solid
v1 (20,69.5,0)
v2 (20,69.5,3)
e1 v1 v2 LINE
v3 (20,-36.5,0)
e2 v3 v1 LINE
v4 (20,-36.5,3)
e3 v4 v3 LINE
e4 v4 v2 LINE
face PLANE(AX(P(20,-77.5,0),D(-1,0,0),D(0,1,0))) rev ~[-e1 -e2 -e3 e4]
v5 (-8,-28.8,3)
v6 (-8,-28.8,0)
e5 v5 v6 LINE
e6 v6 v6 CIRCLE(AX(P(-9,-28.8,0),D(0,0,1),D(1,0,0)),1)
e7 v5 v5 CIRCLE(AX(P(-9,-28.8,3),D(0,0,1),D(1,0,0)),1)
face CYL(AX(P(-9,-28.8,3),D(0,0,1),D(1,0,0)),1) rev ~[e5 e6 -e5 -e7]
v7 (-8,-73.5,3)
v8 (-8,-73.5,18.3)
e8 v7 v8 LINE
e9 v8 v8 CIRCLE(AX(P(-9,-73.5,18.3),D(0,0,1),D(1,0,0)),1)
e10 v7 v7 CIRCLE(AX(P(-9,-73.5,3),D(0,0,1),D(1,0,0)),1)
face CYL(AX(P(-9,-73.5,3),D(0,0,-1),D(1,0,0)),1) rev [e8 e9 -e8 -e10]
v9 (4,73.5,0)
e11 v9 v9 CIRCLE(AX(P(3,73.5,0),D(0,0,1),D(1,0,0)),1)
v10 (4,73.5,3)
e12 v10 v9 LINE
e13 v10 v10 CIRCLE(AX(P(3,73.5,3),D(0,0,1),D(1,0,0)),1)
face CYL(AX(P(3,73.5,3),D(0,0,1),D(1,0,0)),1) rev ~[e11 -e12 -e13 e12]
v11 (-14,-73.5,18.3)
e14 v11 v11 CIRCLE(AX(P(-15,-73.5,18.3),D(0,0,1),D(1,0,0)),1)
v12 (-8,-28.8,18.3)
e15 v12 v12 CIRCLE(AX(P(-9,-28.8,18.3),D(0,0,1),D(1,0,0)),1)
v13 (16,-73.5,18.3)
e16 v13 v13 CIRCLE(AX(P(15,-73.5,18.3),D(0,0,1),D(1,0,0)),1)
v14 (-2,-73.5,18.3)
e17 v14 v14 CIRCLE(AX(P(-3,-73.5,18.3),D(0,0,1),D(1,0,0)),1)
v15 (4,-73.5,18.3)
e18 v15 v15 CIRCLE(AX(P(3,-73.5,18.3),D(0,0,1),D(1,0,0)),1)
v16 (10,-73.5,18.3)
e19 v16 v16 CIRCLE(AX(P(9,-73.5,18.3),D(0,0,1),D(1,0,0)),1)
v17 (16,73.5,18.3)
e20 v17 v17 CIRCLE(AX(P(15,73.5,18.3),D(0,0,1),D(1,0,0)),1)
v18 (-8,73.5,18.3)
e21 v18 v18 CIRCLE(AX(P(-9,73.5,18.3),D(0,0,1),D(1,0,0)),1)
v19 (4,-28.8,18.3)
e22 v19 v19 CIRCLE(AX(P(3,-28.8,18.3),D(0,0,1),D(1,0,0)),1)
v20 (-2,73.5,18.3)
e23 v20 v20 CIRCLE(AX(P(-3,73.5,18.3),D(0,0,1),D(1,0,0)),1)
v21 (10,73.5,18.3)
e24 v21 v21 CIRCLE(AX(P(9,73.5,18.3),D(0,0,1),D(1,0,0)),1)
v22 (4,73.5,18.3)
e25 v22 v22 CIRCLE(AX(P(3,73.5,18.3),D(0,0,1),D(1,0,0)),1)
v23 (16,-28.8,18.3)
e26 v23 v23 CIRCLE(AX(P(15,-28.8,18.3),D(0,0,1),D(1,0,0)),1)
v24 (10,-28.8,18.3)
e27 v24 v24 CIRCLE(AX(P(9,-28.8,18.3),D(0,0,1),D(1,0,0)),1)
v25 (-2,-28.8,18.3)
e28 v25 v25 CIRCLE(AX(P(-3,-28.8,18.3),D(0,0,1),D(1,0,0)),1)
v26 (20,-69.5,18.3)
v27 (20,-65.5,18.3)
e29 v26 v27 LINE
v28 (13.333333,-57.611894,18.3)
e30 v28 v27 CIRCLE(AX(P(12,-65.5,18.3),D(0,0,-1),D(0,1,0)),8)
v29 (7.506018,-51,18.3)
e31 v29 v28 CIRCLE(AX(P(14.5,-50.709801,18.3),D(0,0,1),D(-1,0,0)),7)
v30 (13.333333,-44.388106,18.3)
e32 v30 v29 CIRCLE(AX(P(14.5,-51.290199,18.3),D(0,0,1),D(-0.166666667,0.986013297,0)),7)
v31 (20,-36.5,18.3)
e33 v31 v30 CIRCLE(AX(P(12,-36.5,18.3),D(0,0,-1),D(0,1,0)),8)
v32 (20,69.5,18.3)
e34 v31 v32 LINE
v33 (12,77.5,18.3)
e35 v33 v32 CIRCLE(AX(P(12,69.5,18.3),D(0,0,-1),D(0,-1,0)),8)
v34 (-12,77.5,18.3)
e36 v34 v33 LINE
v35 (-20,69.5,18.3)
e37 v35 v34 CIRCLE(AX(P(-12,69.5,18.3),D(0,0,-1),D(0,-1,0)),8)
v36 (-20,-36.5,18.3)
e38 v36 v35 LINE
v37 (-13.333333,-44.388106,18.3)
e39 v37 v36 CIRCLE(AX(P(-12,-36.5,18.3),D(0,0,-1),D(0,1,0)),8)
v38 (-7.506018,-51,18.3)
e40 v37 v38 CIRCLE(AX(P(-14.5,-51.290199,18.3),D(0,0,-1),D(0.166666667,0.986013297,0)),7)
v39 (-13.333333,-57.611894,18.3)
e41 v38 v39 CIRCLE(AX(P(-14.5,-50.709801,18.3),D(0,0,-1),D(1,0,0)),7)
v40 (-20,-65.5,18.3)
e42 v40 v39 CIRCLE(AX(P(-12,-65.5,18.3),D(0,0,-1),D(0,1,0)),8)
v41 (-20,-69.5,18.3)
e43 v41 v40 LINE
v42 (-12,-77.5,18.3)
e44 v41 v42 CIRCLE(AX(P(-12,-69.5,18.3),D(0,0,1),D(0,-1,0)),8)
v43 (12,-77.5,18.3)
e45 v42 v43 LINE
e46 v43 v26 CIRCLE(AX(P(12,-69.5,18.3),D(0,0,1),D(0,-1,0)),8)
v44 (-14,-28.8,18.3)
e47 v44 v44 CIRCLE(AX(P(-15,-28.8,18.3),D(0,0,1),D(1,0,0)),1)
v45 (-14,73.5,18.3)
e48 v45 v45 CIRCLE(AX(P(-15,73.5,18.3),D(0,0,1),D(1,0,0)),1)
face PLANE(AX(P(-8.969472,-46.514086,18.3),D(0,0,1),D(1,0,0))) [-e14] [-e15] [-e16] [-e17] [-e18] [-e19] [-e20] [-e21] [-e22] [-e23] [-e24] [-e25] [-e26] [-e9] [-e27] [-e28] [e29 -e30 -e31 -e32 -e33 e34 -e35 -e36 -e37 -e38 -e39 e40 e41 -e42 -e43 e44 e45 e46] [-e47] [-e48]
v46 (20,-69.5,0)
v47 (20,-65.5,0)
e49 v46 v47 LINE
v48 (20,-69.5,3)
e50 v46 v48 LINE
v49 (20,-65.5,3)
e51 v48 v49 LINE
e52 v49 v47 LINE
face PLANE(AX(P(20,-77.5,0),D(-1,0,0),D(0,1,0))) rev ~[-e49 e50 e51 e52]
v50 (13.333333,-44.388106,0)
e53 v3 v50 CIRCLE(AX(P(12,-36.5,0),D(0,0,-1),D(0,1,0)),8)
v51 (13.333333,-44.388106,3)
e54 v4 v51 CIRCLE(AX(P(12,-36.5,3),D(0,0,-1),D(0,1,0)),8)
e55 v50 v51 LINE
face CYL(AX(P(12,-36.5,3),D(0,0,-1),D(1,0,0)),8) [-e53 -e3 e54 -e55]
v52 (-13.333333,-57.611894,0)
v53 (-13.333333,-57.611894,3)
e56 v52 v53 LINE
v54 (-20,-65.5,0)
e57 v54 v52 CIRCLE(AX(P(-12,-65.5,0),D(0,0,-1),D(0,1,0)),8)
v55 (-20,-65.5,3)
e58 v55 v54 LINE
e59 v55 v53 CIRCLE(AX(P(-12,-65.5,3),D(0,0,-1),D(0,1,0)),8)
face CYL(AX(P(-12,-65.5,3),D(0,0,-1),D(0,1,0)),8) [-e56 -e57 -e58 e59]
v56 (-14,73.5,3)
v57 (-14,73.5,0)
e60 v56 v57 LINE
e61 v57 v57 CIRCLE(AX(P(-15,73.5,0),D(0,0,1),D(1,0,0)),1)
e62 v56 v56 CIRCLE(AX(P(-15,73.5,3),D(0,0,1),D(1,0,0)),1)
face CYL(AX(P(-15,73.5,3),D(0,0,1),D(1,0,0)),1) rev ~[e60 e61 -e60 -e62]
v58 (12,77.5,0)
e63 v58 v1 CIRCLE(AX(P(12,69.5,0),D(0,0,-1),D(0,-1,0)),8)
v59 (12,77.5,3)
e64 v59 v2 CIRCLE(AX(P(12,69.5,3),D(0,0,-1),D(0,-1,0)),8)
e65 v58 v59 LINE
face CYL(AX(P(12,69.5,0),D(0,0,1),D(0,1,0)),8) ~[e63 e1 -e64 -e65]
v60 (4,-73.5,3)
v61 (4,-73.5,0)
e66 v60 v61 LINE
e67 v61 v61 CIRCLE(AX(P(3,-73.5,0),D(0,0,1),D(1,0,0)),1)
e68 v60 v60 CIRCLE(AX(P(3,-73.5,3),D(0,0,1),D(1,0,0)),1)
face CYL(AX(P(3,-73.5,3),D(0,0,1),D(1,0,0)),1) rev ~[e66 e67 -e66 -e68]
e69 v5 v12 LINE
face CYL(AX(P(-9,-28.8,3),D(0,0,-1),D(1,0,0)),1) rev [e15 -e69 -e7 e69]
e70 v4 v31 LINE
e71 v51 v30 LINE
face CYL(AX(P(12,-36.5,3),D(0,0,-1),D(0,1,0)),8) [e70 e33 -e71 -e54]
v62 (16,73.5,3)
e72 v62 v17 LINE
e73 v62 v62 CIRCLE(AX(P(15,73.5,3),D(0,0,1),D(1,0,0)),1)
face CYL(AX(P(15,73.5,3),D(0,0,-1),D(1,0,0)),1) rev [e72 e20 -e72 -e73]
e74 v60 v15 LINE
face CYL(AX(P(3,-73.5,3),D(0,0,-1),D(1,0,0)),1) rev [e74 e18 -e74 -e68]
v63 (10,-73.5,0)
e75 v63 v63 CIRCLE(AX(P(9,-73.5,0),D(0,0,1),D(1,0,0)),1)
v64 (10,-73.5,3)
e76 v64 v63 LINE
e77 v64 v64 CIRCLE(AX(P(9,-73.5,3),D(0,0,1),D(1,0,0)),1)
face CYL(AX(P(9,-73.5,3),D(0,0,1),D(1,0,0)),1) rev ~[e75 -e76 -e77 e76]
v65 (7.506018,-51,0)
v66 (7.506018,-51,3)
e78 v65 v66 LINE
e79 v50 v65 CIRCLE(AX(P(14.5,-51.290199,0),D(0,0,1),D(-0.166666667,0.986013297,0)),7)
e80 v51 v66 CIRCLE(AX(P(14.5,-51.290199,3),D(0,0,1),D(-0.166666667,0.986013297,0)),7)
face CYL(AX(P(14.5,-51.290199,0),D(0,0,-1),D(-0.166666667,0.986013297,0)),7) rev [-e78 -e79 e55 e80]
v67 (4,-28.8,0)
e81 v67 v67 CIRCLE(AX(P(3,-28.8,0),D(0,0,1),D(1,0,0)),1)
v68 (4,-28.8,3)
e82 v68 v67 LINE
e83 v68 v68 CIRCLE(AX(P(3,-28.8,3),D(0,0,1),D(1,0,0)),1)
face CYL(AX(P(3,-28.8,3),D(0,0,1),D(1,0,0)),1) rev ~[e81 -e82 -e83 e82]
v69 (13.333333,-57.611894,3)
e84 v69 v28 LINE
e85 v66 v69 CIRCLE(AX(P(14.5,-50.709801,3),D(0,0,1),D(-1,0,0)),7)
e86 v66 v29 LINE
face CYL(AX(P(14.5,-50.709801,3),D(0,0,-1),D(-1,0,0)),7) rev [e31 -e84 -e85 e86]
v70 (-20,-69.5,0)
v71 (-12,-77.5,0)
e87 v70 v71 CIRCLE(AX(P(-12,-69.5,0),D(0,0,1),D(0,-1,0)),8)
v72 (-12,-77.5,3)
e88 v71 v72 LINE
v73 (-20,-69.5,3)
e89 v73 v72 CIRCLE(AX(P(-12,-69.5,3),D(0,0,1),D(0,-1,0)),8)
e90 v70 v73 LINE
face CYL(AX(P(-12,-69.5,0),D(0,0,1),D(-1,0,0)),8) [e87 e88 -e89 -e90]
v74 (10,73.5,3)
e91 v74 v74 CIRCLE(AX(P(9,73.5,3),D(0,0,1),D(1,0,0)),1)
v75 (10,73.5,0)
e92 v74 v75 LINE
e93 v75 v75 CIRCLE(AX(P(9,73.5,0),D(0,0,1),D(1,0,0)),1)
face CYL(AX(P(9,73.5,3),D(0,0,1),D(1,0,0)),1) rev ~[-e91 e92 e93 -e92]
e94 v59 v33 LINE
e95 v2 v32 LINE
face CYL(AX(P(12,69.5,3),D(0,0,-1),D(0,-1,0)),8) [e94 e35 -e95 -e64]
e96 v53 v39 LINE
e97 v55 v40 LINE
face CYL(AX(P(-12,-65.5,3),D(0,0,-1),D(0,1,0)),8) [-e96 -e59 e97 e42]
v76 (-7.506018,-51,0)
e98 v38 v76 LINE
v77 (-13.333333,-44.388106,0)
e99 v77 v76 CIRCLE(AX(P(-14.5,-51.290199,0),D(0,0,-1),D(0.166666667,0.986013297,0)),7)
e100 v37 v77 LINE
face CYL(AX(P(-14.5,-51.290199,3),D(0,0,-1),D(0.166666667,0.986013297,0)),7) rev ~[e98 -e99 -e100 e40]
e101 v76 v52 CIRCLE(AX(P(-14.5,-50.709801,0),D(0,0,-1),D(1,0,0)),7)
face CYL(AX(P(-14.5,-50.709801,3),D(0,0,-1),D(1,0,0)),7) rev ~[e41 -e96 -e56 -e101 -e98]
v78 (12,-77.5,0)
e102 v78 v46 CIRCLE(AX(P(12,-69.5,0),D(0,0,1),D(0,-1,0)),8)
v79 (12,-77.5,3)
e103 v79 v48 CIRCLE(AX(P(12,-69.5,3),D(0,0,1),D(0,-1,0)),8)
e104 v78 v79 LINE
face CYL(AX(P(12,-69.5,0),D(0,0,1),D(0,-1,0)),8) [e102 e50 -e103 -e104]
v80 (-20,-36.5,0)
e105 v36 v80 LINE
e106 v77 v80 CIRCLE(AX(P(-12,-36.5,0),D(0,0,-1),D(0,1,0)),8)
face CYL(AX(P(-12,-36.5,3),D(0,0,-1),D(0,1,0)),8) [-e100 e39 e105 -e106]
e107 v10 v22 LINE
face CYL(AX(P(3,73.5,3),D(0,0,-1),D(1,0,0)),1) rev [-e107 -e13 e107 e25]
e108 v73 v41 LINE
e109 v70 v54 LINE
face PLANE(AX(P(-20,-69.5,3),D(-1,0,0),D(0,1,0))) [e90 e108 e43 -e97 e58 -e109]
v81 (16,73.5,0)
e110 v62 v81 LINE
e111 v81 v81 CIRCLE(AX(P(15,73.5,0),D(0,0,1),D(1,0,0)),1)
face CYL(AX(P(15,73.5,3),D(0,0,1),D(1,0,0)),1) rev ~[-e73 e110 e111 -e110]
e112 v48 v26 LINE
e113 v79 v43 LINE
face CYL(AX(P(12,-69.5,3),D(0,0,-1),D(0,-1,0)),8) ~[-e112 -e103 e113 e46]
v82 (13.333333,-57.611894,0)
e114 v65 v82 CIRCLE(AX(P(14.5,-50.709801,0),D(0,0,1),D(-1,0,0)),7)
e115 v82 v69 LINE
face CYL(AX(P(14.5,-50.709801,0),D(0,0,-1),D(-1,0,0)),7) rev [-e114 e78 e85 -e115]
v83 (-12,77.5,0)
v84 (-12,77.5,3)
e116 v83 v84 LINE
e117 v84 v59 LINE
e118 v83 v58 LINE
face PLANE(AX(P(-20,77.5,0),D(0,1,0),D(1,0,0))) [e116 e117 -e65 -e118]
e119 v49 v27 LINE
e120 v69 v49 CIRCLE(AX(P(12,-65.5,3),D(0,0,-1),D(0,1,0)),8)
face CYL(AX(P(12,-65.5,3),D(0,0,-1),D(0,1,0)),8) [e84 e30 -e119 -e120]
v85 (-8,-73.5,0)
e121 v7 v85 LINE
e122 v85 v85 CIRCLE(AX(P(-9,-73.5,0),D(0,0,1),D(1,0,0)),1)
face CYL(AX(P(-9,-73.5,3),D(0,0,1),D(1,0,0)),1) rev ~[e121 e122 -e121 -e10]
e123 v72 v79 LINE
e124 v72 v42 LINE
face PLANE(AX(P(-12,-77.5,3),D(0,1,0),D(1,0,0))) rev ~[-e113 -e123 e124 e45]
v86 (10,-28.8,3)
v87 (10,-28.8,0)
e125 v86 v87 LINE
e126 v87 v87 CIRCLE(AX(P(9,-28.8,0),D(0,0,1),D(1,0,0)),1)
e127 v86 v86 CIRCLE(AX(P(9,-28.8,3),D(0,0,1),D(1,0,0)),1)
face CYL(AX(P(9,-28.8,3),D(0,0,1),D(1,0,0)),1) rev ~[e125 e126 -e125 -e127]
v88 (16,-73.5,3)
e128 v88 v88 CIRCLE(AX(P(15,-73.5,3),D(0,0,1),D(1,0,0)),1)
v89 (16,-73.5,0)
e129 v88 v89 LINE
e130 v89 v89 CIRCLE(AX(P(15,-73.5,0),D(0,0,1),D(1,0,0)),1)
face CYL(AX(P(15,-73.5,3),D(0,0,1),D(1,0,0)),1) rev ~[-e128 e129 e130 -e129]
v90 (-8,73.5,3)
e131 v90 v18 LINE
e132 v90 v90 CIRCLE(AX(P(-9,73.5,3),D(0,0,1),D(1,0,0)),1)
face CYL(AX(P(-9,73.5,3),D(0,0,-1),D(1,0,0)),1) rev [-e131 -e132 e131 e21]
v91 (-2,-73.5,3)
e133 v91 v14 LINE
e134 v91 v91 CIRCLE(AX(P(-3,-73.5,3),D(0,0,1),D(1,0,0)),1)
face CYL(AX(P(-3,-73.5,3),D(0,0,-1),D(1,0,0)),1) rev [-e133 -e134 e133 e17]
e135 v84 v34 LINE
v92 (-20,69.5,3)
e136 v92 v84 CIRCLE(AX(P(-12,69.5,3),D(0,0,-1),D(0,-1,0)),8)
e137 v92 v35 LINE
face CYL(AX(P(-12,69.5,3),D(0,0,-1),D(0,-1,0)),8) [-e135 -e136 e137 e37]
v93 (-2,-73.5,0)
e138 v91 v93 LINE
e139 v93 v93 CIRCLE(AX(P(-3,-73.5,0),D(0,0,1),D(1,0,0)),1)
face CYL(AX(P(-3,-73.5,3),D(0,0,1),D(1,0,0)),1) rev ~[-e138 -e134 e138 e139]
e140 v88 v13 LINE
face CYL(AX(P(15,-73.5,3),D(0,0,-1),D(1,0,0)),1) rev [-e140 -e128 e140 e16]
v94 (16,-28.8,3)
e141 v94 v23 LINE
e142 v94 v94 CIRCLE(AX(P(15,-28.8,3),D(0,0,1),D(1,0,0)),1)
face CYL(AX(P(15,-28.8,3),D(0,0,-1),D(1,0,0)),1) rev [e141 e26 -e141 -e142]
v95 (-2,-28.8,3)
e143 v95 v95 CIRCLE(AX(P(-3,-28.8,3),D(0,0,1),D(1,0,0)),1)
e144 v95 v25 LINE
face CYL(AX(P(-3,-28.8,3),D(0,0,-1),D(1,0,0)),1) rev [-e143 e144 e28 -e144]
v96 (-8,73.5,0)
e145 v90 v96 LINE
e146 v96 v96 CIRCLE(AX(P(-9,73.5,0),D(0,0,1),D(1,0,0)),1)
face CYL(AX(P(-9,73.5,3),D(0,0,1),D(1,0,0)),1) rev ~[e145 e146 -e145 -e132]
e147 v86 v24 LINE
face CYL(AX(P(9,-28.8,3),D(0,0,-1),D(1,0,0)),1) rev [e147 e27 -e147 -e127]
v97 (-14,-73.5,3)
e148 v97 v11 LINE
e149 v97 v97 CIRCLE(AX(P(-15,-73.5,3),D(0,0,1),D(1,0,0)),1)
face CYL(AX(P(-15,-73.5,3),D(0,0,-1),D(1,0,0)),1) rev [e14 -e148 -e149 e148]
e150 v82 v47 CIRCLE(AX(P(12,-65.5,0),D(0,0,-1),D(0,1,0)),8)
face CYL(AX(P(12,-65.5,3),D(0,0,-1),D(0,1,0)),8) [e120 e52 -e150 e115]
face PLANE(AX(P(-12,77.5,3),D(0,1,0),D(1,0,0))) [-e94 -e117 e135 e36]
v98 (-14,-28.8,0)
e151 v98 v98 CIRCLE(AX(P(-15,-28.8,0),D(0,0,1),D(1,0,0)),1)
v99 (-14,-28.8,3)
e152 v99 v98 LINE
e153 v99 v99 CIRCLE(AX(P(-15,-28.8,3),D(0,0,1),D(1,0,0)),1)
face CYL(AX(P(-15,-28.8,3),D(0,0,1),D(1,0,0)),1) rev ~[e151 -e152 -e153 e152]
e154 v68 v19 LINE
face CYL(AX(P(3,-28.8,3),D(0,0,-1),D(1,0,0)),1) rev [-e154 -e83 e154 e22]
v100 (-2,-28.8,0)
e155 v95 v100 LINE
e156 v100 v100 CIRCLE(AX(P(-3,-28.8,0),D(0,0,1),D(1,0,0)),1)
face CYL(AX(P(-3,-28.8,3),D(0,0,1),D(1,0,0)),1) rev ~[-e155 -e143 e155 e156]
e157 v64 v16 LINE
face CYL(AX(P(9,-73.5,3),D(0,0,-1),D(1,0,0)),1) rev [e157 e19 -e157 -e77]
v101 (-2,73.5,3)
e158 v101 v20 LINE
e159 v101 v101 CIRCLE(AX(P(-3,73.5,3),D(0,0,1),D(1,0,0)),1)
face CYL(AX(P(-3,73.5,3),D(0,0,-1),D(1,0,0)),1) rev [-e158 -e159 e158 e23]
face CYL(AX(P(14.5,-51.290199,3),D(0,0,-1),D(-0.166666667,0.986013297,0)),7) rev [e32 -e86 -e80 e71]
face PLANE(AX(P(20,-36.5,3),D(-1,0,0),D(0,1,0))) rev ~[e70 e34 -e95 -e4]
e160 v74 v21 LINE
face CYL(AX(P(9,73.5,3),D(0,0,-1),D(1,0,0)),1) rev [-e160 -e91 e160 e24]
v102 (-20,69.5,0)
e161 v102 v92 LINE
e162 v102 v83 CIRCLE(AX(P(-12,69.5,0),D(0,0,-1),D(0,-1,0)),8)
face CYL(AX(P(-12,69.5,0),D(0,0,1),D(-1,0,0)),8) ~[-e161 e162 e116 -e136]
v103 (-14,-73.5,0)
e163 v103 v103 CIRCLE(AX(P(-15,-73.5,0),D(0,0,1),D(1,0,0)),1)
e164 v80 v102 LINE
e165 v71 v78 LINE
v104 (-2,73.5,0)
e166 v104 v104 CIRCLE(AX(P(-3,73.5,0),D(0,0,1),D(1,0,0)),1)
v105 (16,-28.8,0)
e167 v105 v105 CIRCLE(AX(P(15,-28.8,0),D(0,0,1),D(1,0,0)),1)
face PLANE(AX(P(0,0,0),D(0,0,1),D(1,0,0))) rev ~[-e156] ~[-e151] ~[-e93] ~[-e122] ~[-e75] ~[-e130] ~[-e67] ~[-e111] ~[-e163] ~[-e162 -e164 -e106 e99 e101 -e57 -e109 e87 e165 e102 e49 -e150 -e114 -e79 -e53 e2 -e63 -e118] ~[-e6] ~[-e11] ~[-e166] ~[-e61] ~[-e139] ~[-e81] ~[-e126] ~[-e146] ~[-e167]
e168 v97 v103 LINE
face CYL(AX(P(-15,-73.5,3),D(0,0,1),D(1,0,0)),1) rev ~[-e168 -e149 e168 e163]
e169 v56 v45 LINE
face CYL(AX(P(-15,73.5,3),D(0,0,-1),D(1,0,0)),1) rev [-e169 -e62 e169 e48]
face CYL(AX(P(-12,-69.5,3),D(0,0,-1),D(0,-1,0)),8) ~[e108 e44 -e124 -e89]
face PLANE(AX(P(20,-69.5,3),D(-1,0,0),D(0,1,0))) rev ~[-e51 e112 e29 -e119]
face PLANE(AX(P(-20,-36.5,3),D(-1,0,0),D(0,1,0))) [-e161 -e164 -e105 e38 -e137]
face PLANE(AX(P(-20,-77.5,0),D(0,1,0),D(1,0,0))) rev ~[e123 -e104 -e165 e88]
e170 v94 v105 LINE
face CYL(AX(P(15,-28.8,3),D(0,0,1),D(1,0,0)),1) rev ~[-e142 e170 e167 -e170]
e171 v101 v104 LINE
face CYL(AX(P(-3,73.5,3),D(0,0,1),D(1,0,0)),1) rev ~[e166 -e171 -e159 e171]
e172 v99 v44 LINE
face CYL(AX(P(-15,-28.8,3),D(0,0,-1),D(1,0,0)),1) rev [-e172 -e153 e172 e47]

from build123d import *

# Parameters (mm, degrees)
F0_W        = 40
F0_H        = 155
F1_DEPTH    = 3
F2_W        = 12.5
F2_H        = 13
F3_DEPTH    = 3
F4_R        = 8
F5_T1_DEPTH = 3
F6_R        = 1
F7_DEPTH    = 3
F8_DEPTH    = 15.3


# Not quite as in the source:
# - a fillet or chamfer that OpenCascade refuses, or shapes differently, is made with other operations: its cross-section is extruded or revolved along the edge and cut away or added


with BuildPart() as f1:
    # F0 (on Top) → F1 (new body)
    with BuildSketch(Plane.XY):
        Rectangle(F0_W, F0_H)
    extrude(amount=F1_DEPTH)

    # F2 (on face) → F3 (cut, through all)
    with BuildSketch(Plane.XY.offset(3)):
        with Locations((-13.75, -51)):
            Rectangle(F2_W, F2_H)
        with Locations((13.75, -51)):
            Rectangle(F2_W, F2_H)
    extrude(amount=-F3_DEPTH, mode=Mode.SUBTRACT)

    # F4
    f4_edges = [f1.edges().sort_by_distance(p)[0] for p in [
        (-20, -44.5, 1.5),
        (20, -44.5, 1.5),
        (20, -57.5, 1.5),
        (-20, -57.5, 1.5),
        (-20, -77.5, 1.5),
        (20, -77.5, 1.5),
        (-20, 77.5, 1.5),
        (20, 77.5, 1.5),
    ]]
    fillet(f4_edges, radius=F4_R)

    # F5: fillet of radius 7 on 4 edges, made by hand

    # F5_s2 → F5_t1 (join)
    with BuildSketch(Plane.XY):
        with BuildLine():
            ThreePointArc((-13.3333333333, -44.3881063775), (-9.1536616892, -46.7717188872), (-7.5, -51.2901994578))
            Line((-7.5, -51.2901994578), (-6.8, -51.2901994578))
            Line((-6.8, -51.2901994578), (-6.8, -44.5))
            Line((-6.8, -44.5), (-7.5, -43.8))
            ThreePointArc((-7.5, -43.8), (-12, -43.8), (-13.2166666667, -43.6978970694))
            Line((-13.2166666667, -43.6978970694), (-13.3333333333, -44.3881063775))
        make_face()
        with BuildLine():
            ThreePointArc((-7.5, -50.7098005422), (-9.1536616892, -55.2282811128), (-13.3333333333, -57.6118936225))
            Line((-13.3333333333, -57.6118936225), (-13.2166666667, -58.3021029306))
            ThreePointArc((-13.2166666667, -58.3021029306), (-12, -58.2), (-7.5, -58.2))
            Line((-7.5, -58.2), (-6.8, -57.5))
            Line((-6.8, -57.5), (-6.8, -50.7098005422))
            Line((-6.8, -50.7098005422), (-7.5, -50.7098005422))
        make_face()
        with BuildLine():
            ThreePointArc((13.3333333333, -44.3881063775), (9.1536616892, -46.7717188872), (7.5, -51.2901994578))
            Line((7.5, -51.2901994578), (6.8, -51.2901994578))
            Line((6.8, -51.2901994578), (6.8, -44.5))
            Line((6.8, -44.5), (7.5, -43.8))
            ThreePointArc((7.5, -43.8), (12, -43.8), (13.2166666667, -43.6978970694))
            Line((13.2166666667, -43.6978970694), (13.3333333333, -44.3881063775))
        make_face()
        with BuildLine():
            ThreePointArc((7.5, -50.7098005422), (9.1536616892, -55.2282811128), (13.3333333333, -57.6118936225))
            Line((13.3333333333, -57.6118936225), (13.2166666667, -58.3021029306))
            ThreePointArc((13.2166666667, -58.3021029306), (12, -58.2), (7.5, -58.2))
            Line((7.5, -58.2), (6.8, -57.5))
            Line((6.8, -57.5), (6.8, -50.7098005422))
            Line((6.8, -50.7098005422), (7.5, -50.7098005422))
        make_face()
    extrude(amount=F5_T1_DEPTH)

    # F6 (on face) → F7 (cut, through all)
    with BuildSketch(Plane.XY.offset(3)):
        with Locations((-15, -73.5)):
            Circle(F6_R)
        with Locations((-9, -73.5)):
            Circle(F6_R)
        with Locations((-3, -73.5)):
            Circle(F6_R)
        with Locations((3, -73.5)):
            Circle(F6_R)
        with Locations((-15, -28.8)):
            Circle(F6_R)
        with Locations((-9, -28.8)):
            Circle(F6_R)
        with Locations((-3, -28.8)):
            Circle(F6_R)
        with Locations((3, -28.8)):
            Circle(F6_R)
        with Locations((-15, 73.5)):
            Circle(F6_R)
        with Locations((-9, 73.5)):
            Circle(F6_R)
        with Locations((-3, 73.5)):
            Circle(F6_R)
        with Locations((3, 73.5)):
            Circle(F6_R)
        with Locations((9, -73.5)):
            Circle(F6_R)
        with Locations((15, -73.5)):
            Circle(F6_R)
        with Locations((9, -28.8)):
            Circle(F6_R)
        with Locations((15, -28.8)):
            Circle(F6_R)
        with Locations((9, 73.5)):
            Circle(F6_R)
        with Locations((15, 73.5)):
            Circle(F6_R)
    extrude(amount=-F7_DEPTH, mode=Mode.SUBTRACT)

    # F8 (add): a face of the model
    f8_faces = [f1.faces().sort_by_distance(p)[0] for p in [
        (0, 3.1365524685, 3),
    ]]
    extrude(f8_faces, amount=F8_DEPTH)


solid = f1.part
